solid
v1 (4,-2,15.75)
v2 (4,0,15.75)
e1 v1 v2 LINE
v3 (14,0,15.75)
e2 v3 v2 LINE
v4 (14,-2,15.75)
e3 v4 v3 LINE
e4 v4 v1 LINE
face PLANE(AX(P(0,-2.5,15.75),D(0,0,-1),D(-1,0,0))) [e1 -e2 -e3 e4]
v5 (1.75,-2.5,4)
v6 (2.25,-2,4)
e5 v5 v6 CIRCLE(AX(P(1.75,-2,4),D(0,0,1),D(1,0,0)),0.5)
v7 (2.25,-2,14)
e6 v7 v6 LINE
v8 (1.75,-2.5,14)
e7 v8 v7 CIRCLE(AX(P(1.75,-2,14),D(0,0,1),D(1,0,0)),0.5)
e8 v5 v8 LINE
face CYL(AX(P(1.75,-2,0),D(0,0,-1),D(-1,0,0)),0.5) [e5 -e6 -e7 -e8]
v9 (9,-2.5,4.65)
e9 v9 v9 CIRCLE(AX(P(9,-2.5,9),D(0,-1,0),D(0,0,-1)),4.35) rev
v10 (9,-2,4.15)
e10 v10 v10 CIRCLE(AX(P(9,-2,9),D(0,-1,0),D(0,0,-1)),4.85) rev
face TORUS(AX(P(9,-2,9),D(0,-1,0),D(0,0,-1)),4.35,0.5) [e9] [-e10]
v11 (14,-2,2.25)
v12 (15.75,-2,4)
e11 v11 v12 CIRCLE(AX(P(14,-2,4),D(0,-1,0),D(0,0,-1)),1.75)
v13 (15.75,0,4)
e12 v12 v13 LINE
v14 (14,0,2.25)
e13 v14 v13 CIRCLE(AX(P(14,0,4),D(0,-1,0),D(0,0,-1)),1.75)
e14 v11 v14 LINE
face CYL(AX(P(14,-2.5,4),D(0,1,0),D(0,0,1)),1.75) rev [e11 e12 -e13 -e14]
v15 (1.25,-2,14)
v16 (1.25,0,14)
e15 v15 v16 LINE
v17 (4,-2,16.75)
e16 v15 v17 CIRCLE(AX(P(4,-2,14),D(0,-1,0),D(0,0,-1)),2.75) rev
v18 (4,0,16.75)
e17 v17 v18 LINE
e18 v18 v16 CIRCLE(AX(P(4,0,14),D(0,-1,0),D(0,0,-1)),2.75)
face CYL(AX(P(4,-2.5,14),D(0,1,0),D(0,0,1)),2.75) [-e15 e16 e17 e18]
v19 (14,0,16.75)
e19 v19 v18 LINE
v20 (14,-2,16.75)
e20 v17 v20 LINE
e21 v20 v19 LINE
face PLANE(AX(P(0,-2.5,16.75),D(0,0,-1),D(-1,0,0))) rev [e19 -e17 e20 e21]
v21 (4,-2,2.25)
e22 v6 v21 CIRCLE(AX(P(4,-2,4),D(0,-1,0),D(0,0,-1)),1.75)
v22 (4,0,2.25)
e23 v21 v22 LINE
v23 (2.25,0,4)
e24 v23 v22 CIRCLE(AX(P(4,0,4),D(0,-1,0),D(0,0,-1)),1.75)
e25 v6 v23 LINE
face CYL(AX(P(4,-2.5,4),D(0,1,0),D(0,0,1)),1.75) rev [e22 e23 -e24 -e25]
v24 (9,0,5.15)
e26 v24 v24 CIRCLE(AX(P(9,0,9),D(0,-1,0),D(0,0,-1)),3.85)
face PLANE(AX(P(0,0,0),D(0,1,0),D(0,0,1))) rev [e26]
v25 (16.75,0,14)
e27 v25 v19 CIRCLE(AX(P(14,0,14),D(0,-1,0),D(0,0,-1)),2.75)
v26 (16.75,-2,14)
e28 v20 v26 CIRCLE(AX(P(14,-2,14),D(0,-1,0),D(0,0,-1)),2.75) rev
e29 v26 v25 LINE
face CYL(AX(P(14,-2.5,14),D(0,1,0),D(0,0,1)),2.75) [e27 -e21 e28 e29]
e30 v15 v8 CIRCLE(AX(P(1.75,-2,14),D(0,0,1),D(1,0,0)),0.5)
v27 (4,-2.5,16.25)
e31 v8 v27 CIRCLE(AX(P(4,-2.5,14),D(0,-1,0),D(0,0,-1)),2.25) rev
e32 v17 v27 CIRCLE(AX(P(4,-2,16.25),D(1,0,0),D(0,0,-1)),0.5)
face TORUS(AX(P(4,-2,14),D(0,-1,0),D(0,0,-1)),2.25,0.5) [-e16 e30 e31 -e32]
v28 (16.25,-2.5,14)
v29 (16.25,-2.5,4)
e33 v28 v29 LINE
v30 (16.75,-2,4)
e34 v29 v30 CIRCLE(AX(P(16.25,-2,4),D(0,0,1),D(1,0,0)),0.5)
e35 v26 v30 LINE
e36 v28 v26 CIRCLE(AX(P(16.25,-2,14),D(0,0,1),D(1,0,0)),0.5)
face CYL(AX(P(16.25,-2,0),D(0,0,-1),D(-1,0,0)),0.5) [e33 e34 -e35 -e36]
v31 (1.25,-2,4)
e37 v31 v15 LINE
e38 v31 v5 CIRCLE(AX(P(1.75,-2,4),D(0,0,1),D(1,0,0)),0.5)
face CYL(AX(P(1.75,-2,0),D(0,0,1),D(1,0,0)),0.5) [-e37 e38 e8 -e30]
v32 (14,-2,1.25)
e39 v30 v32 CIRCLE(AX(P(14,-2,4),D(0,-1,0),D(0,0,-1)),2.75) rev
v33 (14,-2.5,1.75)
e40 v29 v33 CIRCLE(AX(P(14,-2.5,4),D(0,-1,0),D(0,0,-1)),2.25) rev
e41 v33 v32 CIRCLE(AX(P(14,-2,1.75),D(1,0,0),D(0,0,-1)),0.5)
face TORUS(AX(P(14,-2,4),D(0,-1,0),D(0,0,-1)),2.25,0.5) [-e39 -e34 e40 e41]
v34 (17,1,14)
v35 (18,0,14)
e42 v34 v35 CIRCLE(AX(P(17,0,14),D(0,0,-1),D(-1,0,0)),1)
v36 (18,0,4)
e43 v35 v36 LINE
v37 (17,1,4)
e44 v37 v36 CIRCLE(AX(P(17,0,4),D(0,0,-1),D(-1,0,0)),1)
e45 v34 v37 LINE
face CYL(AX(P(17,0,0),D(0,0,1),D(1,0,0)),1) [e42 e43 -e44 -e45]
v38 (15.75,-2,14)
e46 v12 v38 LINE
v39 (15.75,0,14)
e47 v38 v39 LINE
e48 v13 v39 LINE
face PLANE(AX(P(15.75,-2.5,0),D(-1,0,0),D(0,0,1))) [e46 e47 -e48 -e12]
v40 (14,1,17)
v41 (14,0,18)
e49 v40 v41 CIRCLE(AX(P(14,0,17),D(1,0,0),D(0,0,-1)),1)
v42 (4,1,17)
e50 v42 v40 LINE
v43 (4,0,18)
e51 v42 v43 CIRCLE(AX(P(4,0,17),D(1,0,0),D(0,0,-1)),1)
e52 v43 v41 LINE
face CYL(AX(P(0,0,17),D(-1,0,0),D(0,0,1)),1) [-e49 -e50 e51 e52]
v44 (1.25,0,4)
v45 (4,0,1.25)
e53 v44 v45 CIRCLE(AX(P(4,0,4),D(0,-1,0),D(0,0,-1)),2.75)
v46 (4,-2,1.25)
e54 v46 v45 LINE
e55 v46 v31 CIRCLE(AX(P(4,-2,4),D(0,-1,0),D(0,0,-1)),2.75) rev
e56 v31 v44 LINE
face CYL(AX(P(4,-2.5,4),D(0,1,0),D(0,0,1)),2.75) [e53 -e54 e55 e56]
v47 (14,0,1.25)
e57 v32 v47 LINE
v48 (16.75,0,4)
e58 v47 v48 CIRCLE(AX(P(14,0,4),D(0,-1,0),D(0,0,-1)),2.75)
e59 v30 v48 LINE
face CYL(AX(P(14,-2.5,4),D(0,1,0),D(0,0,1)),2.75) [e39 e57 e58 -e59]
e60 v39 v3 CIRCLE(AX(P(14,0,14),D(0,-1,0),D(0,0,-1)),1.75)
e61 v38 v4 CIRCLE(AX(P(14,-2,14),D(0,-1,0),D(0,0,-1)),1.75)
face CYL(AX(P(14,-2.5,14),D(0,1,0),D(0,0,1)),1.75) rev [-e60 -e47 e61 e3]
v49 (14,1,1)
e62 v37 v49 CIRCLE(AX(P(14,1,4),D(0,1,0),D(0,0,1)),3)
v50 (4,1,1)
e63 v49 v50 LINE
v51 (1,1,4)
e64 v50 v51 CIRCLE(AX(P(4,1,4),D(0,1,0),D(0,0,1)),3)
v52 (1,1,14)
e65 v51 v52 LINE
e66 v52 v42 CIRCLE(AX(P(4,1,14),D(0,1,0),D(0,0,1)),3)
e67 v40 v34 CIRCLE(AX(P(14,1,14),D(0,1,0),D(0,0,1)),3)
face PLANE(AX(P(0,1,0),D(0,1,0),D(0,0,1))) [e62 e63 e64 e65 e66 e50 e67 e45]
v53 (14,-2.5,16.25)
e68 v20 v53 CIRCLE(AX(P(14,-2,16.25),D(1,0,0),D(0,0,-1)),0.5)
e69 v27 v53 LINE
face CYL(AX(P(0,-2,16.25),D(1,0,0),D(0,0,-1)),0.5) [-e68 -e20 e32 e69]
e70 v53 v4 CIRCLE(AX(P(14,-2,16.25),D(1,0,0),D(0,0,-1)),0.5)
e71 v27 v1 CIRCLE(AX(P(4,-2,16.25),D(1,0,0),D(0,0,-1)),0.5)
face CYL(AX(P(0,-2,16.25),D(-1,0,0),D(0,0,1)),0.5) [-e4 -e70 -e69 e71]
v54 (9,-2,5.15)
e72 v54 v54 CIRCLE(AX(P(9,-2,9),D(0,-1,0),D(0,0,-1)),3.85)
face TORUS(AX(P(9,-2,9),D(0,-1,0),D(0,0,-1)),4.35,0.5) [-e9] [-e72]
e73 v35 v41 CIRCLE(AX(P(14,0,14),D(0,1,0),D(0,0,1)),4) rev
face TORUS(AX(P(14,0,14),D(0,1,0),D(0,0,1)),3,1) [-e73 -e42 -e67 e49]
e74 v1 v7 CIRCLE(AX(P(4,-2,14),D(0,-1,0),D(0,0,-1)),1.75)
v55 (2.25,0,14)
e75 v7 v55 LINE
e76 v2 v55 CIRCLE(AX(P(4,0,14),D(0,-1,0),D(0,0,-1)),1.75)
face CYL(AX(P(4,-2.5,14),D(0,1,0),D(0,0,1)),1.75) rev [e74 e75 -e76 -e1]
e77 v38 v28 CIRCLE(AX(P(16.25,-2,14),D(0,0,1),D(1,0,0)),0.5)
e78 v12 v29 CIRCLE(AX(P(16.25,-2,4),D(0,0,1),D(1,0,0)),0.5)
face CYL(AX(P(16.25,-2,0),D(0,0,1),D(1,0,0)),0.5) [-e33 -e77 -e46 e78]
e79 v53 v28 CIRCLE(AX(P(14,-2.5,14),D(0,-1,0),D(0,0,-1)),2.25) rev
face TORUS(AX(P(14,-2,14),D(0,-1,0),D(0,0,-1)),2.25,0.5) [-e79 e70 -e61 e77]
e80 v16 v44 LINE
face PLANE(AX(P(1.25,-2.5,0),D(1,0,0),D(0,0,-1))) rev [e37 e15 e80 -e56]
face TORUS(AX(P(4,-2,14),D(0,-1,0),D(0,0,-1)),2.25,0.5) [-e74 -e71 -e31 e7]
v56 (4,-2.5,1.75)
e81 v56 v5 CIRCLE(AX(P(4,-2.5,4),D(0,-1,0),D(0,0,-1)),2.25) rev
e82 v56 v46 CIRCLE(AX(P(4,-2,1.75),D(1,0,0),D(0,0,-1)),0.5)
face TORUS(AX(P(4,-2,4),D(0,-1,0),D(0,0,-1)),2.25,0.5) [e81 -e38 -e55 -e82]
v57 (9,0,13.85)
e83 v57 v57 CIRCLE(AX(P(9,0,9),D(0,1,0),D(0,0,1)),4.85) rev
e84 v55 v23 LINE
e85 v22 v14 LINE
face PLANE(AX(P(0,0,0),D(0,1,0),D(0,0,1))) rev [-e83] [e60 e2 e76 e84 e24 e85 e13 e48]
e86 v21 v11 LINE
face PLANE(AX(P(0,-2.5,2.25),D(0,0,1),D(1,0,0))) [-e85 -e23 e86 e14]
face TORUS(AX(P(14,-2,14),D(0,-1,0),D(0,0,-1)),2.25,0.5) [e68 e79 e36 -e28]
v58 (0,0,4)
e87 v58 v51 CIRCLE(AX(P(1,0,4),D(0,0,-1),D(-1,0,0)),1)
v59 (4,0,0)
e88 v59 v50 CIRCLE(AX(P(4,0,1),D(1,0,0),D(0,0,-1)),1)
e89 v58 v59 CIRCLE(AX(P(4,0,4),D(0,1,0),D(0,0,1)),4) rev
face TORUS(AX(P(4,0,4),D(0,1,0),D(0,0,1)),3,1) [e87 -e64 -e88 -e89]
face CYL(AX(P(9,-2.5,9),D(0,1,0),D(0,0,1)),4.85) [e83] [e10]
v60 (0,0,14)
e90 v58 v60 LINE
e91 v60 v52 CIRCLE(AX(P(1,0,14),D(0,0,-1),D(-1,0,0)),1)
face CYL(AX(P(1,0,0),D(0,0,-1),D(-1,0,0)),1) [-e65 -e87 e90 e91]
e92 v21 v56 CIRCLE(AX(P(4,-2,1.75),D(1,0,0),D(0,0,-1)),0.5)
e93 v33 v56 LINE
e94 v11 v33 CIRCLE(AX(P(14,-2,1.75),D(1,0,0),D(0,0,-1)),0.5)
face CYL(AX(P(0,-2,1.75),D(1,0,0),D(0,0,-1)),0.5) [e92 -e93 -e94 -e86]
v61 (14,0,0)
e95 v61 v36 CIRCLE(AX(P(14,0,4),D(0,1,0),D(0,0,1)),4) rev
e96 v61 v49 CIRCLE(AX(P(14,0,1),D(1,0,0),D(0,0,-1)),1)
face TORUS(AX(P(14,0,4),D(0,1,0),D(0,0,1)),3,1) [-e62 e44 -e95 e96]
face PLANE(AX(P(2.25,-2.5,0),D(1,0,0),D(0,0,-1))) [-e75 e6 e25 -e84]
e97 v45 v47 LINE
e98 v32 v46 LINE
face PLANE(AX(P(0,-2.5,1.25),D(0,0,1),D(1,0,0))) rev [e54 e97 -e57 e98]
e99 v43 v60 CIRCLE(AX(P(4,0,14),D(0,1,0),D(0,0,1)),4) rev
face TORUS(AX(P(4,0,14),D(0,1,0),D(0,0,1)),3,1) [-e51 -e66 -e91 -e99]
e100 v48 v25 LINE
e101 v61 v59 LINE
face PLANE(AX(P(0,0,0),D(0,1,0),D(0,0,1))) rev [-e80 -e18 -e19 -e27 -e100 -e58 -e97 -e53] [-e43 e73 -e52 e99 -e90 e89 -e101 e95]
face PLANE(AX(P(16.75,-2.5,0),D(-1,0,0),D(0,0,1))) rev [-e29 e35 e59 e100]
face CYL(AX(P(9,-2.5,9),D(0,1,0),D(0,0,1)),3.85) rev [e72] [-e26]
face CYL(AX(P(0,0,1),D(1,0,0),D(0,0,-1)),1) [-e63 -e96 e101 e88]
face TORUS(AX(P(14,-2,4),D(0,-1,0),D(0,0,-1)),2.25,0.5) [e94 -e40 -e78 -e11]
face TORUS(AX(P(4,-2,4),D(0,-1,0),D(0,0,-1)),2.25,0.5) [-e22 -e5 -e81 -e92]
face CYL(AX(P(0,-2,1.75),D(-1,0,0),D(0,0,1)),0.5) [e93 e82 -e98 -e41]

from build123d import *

# Parameters (mm, degrees)
SKETCH1_W           = 18
SKETCH1_H           = 18
BOSS_EXTRUDE1_DEPTH = 1
FILLET1_R           = 4
SKETCH2_R           = 4.85
SKETCH2_R_2         = 3.85
BOSS_EXTRUDE2_DEPTH = 2.5
FILLET2_R           = 1
FILLET3_R           = 0.5


with BuildPart() as part:
    # Sketch1 → Boss-Extrude1 (new body)
    with BuildSketch(Plane(origin=(0, 0, 0), x_dir=(1, 0, 0), z_dir=(0, 1, 0))):
        with Locations((9, -9)):
            Rectangle(SKETCH1_W, SKETCH1_H)
    extrude(amount=BOSS_EXTRUDE1_DEPTH)

    # Fillet1
    fillet1_edges = [part.edges().sort_by_distance(p)[0] for p in [
        (0, 0.5, 0),
        (18, 0.5, 0),
        (18, 0.5, 18),
        (0, 0.5, 18),
    ]]
    fillet(fillet1_edges, radius=FILLET1_R)

    # Sketch2 → Boss-Extrude2 (add)
    # profile 1 of 2: a face of its own
    with BuildSketch(Plane.XZ):
        with BuildLine():
            Line((1.25, 14), (1.25, 4))
            ThreePointArc((1.25, 4), (2.055456352, 2.055456352), (4, 1.25))
            Line((4, 1.25), (14, 1.25))
            ThreePointArc((14, 1.25), (15.944543648, 2.055456352), (16.75, 4))
            Line((16.75, 4), (16.75, 14))
            ThreePointArc((16.75, 14), (15.944543648, 15.944543648), (14, 16.75))
            Line((14, 16.75), (4, 16.75))
            ThreePointArc((4, 16.75), (2.055456352, 15.944543648), (1.25, 14))
        make_face()
        with BuildLine():
            Line((2.25, 14), (2.25, 4))
            ThreePointArc((2.25, 4), (2.762563133, 2.762563133), (4, 2.25))
            Line((4, 2.25), (14, 2.25))
            ThreePointArc((14, 2.25), (15.237436867, 2.762563133), (15.75, 4))
            Line((15.75, 4), (15.75, 14))
            ThreePointArc((15.75, 14), (15.237436867, 15.237436867), (14, 15.75))
            Line((14, 15.75), (4, 15.75))
            ThreePointArc((4, 15.75), (2.762563133, 15.237436867), (2.25, 14))
        make_face(mode=Mode.SUBTRACT)
    # profile 2 of 2: a face of its own
    with BuildSketch(Plane.XZ):
        with Locations(Location((9, 9, 0), (0, 0, 90))):
            Circle(SKETCH2_R)
        with Locations(Location((9, 9, 0), (0, 0, 270))):
            Circle(SKETCH2_R_2, mode=Mode.SUBTRACT)
    extrude(amount=BOSS_EXTRUDE2_DEPTH)

    # Fillet2
    fillet2_edges = [part.edges().sort_by_distance(p)[0] for p in [
        (16.828427125, 1, 1.171572875),
        (18, 1, 9),
        (16.828427125, 1, 16.828427125),
        (9, 1, 18),
        (1.171572875, 1, 16.828427125),
        (0, 1, 9),
        (1.171572875, 1, 1.171572875),
        (9, 1, 0),
    ]]
    fillet(fillet2_edges, radius=FILLET2_R - 0.0001)  # a hair under: the kernel refuses the full size

    # Fillet3
    fillet3_edges = [part.edges().sort_by_distance(p)[0] for p in [
        (2.762563133, -2.5, 15.237436867),
        (9, -2.5, 15.75),
        (15.237436867, -2.5, 15.237436867),
        (15.75, -2.5, 9),
        (15.237436867, -2.5, 2.762563133),
        (9, -2.5, 2.25),
        (2.762563133, -2.5, 2.762563133),
        (2.25, -2.5, 9),
        (9, -2.5, 16.75),
        (2.055456352, -2.5, 15.944543648),
        (1.25, -2.5, 9),
        (2.055456352, -2.5, 2.055456352),
        (9, -2.5, 1.25),
        (15.944543648, -2.5, 2.055456352),
        (16.75, -2.5, 9),
        (15.944543648, -2.5, 15.944543648),
        (9, -2.5, 12.85),
        (9, -2.5, 4.15),
    ]]
    fillet(fillet3_edges, radius=FILLET3_R - 0.0001)  # a hair under: the kernel refuses the full size


solid = part.part
